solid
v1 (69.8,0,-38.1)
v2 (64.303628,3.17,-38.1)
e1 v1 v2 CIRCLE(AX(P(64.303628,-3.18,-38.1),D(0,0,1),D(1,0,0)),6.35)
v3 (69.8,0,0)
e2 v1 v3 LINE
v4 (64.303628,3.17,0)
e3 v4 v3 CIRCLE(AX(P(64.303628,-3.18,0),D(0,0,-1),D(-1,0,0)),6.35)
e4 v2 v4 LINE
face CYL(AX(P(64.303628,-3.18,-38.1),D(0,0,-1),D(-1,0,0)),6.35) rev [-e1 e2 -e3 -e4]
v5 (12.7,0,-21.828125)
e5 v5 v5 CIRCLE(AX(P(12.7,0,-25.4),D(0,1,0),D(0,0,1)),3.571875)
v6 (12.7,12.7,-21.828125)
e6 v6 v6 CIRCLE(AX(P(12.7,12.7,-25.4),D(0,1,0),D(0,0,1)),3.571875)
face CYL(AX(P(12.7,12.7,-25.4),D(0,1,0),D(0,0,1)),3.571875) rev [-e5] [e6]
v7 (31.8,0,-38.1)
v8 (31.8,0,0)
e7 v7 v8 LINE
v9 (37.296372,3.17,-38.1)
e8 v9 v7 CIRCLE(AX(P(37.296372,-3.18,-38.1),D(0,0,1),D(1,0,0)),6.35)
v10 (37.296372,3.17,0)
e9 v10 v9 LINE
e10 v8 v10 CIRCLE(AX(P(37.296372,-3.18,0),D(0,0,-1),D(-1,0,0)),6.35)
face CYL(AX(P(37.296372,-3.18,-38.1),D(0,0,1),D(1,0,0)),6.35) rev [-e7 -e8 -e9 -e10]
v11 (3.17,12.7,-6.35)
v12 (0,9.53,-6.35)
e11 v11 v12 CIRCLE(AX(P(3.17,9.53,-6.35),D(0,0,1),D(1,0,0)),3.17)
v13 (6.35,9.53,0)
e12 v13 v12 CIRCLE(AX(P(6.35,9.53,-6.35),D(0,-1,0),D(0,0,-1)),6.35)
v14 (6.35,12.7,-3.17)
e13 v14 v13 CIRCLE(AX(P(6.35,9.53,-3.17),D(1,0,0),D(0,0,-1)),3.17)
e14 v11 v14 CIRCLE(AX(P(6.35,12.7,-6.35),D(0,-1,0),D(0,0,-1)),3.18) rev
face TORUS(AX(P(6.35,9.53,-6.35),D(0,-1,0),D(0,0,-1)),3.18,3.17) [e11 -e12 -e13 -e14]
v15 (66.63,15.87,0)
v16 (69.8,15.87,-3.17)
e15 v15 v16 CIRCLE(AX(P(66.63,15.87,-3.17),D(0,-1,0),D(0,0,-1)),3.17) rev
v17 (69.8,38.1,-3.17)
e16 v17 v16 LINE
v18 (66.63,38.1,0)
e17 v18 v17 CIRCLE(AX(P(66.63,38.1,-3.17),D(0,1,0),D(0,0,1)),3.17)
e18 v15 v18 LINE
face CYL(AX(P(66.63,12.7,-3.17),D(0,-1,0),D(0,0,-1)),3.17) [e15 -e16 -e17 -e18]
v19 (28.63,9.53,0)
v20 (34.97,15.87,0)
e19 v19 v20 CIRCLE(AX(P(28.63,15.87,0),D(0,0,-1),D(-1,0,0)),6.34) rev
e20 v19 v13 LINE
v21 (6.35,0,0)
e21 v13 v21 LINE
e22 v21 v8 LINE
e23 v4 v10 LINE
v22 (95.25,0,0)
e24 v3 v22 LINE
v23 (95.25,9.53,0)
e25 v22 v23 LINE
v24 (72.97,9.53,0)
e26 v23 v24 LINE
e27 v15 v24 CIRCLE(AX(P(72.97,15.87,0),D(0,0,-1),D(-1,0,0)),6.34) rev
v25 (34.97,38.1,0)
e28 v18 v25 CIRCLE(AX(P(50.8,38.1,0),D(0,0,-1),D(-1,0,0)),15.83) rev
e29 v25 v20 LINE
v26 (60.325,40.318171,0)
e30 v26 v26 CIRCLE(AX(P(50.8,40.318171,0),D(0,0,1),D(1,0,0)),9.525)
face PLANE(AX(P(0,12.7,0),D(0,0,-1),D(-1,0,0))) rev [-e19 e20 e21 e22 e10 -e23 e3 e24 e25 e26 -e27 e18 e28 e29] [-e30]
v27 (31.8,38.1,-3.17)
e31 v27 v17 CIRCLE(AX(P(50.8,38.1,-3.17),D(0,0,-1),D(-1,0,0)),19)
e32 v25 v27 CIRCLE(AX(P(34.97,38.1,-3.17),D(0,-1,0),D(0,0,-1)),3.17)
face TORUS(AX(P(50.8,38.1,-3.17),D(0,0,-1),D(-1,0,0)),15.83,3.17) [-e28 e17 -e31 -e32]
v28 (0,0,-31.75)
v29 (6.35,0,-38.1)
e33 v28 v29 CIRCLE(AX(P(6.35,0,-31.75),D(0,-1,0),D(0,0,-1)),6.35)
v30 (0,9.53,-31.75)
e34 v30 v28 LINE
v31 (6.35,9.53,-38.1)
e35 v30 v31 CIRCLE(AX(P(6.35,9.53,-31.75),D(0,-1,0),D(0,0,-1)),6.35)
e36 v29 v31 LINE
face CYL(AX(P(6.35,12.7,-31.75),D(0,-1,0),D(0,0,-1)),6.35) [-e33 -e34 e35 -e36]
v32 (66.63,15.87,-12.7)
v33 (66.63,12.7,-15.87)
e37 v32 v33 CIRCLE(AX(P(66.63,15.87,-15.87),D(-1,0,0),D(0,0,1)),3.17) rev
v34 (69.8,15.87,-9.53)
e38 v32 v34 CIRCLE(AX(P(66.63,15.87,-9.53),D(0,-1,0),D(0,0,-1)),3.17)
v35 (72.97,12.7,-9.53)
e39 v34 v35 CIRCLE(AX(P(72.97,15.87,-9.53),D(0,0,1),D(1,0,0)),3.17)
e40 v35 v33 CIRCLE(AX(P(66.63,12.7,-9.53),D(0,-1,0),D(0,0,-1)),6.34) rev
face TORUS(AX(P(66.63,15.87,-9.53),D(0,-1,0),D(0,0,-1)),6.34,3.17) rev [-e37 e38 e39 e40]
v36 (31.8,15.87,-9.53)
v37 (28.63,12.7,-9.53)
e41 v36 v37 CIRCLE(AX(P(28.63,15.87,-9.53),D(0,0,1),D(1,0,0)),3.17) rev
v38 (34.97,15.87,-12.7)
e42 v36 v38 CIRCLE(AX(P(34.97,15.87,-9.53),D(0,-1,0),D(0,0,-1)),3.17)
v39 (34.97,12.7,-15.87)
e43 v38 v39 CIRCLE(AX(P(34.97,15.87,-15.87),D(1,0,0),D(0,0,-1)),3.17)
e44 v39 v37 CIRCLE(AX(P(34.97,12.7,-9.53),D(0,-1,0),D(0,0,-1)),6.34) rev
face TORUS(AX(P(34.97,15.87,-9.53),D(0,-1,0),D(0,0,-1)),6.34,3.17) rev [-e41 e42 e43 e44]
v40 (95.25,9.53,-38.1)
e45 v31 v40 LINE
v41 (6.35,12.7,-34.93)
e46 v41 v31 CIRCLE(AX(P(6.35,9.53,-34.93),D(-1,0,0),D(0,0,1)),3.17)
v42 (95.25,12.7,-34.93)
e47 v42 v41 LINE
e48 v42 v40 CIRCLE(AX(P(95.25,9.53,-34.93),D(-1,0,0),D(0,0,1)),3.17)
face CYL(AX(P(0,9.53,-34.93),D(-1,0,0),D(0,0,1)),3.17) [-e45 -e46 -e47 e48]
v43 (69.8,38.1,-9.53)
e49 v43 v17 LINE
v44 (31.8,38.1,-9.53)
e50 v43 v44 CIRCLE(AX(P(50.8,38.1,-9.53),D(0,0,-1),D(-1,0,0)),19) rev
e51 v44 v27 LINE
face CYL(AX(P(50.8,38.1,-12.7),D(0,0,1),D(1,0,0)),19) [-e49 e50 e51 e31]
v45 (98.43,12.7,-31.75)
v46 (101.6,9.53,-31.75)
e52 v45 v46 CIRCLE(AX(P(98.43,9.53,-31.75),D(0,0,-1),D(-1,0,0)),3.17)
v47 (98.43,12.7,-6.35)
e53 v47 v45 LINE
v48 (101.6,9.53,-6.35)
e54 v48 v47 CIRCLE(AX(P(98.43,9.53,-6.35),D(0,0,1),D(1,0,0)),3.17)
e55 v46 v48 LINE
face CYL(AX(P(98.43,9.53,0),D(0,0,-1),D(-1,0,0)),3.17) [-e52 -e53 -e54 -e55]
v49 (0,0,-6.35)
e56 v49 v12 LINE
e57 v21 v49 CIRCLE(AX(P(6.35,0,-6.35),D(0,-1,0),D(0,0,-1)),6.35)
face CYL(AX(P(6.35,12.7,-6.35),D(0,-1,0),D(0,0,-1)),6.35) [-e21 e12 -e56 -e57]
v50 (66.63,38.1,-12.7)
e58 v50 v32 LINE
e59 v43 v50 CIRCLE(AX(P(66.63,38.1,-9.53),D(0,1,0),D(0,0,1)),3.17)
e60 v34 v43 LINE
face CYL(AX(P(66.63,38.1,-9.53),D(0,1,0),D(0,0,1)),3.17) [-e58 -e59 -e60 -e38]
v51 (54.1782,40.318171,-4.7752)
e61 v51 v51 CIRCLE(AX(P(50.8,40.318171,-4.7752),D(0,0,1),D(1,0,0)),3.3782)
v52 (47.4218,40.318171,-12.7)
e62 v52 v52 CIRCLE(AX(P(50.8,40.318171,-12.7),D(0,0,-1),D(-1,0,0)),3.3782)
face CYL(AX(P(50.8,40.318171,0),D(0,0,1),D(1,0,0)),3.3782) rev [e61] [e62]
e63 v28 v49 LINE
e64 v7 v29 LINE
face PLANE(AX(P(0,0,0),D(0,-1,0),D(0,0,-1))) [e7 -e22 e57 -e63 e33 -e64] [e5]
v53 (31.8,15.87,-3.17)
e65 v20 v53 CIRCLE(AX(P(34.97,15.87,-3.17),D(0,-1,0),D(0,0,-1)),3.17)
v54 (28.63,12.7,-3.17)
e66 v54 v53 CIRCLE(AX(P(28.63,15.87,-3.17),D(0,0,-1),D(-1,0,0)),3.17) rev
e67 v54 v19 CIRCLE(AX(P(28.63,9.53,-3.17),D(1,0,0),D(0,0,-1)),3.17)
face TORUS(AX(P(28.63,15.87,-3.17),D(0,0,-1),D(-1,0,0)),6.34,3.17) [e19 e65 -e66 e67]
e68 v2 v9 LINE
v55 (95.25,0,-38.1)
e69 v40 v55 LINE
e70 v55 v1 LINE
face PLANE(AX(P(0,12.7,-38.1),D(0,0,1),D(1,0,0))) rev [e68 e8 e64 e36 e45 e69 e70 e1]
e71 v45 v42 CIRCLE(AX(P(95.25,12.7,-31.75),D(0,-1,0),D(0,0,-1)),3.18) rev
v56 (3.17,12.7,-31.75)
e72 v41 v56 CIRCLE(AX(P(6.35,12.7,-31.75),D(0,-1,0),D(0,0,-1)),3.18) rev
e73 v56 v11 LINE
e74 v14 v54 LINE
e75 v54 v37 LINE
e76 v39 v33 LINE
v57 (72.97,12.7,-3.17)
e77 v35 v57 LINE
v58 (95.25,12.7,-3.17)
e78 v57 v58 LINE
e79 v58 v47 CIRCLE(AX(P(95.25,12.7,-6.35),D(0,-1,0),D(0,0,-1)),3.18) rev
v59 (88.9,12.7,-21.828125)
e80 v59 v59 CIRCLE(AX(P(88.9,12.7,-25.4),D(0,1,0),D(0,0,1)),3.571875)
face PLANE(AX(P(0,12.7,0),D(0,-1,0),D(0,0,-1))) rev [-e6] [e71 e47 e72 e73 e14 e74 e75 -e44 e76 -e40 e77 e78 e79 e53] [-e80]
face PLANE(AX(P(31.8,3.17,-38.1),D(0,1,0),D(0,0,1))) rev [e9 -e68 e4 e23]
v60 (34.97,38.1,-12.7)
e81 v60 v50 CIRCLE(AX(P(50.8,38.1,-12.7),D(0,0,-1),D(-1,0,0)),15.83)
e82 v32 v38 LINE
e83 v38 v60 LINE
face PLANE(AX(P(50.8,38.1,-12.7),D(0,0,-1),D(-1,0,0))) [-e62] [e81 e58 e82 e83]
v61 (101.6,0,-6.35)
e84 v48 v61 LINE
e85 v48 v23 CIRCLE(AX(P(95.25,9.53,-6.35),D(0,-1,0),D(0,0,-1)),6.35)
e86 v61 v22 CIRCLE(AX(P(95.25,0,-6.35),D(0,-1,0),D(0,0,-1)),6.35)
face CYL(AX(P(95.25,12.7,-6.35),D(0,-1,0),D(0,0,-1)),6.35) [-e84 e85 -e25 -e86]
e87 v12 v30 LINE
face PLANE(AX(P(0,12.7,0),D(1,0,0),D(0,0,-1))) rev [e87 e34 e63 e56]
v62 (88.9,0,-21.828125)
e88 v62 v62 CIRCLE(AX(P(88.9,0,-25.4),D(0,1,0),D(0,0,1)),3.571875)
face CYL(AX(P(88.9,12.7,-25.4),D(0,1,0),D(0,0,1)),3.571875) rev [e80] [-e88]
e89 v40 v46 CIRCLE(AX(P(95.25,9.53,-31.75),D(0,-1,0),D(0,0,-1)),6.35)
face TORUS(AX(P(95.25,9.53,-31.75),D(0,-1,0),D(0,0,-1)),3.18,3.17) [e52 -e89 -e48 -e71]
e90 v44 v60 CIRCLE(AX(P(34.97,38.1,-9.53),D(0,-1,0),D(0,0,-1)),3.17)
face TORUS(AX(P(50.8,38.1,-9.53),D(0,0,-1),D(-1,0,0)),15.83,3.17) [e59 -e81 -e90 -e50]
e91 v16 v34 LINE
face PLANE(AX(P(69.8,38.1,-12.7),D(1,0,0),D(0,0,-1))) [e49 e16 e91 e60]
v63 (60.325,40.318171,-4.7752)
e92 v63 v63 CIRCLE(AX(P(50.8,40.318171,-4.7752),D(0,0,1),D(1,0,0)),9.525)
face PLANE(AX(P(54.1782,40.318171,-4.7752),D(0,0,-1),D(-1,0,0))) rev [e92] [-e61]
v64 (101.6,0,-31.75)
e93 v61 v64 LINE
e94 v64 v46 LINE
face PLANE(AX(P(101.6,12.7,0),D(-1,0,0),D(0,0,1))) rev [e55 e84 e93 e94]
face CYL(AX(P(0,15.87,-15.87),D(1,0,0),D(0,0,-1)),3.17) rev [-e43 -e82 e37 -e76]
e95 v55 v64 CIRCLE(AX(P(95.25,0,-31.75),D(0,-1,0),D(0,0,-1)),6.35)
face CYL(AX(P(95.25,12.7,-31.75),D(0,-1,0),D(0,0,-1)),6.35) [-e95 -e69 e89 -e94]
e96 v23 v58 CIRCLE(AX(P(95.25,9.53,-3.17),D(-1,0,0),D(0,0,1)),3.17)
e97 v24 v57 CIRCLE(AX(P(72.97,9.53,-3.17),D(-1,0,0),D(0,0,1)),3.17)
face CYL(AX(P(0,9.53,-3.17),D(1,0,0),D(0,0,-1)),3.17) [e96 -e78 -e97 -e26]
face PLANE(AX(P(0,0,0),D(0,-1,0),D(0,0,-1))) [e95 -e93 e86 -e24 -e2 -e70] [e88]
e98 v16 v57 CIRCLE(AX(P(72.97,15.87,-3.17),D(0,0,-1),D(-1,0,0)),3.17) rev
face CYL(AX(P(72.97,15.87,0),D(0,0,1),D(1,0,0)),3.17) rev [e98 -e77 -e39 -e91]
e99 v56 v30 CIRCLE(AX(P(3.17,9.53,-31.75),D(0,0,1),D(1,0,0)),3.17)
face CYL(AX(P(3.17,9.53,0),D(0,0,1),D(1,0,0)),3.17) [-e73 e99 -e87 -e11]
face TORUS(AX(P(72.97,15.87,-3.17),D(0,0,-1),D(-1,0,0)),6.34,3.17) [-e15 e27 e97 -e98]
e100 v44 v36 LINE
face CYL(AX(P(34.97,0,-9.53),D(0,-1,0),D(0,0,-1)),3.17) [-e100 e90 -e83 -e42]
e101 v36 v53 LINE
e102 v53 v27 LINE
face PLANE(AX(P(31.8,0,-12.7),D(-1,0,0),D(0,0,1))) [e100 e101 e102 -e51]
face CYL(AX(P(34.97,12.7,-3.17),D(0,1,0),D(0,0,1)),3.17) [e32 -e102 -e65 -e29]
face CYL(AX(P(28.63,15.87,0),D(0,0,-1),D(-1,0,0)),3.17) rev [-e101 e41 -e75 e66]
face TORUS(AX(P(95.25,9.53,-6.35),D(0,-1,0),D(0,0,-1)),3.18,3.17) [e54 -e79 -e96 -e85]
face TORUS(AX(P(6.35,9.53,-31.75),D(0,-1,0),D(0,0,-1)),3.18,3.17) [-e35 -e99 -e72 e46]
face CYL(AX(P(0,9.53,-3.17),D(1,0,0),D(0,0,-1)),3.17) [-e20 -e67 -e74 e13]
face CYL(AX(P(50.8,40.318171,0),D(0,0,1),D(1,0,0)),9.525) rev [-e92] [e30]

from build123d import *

# Parameters (mm, degrees)
SKETCH1_W                                = 101.6
SKETCH1_H                                = 38.1
BASEPLATE_DEPTH                          = 12.7
VERTBOSS_DEPTH                           = 12.7
F_9_32_0_28125_DIAMETER_HOLE1_D          = 7.14375
CBORE_FOR_1_4_HEX_HEAD_BOLT1_D           = 6.7564
CBORE_FOR_1_4_HEX_HEAD_BOLT1_CBORE_D     = 19.05
CBORE_FOR_1_4_HEX_HEAD_BOLT1_CBORE_DEPTH = 4.7752
SKETCH11_W                               = 38
SKETCH11_H                               = 3.17
BOTTOMSLOT_DEPTH                         = 123.615578129
FILLET1_R                                = 6.35
FILLET2_R                                = 3.17


with BuildPart() as part:
    # Sketch1 → BasePlate (new body)
    with BuildSketch(Plane(origin=(0, 0, 0), x_dir=(1, 0, 0), z_dir=(0, 1, 0))):
        with Locations((50.8, 19.05)):
            Rectangle(SKETCH1_W, SKETCH1_H)
    extrude(amount=BASEPLATE_DEPTH)

    # Sketch3 → VertBoss (add)
    with BuildSketch(Plane.XY):
        with BuildLine():
            Line((31.8, 0), (31.8, 38.1))
            ThreePointArc((31.8, 38.1), (50.8, 57.1), (69.8, 38.1))
            Line((69.8, 38.1), (69.8, 0))
            Line((69.8, 0), (31.8, 0))
        make_face()
    extrude(amount=-VERTBOSS_DEPTH)

    # 9/32 (0.28125) Diameter Hole1 (through all)
    with Locations(Plane(origin=(0, 12.7, 0), x_dir=(1, 0, 0), z_dir=(0, 1, 0))):
        with Locations((88.9, 25.4), (12.7, 25.4)):
            Hole(F_9_32_0_28125_DIAMETER_HOLE1_D / 2)

    # CBORE for 1/4 Hex Head Bolt1 (through all)
    with Locations(Plane.XY):
        with Locations((50.8, 40.318171365)):
            CounterBoreHole(CBORE_FOR_1_4_HEX_HEAD_BOLT1_D / 2, CBORE_FOR_1_4_HEX_HEAD_BOLT1_CBORE_D / 2, CBORE_FOR_1_4_HEX_HEAD_BOLT1_CBORE_DEPTH)

    # Sketch11 → BottomSlot (cut, through all)
    with BuildSketch(Plane.XY):
        with Locations((50.8, 1.585)):
            Rectangle(SKETCH11_W, SKETCH11_H)
    extrude(amount=-BOTTOMSLOT_DEPTH, mode=Mode.SUBTRACT)

    # Fillet1
    # the kernel refuses this fillet: 6.35 mm, written as the material it adds along each edge
    with BuildSketch(Plane(origin=(69.8, 3.17, 0), x_dir=(-1, 0, 0), z_dir=(0, 0, -1))) as fillet1_piece_1:
        with BuildLine():
            CenterArc((5.49637153, -6.35), FILLET1_R, 90, 59.947892244)
            Line((0, -3.17), (0, 0))
            Line((0, 0), (5.49637153, 0))
        make_face()
    extrude(amount=38.1)
    with BuildSketch(Plane(origin=(31.8, 3.17, 0), x_dir=(0, -1, 0), z_dir=(0, 0, -1))) as fillet1_piece_2:
        with BuildLine():
            CenterArc((6.35, -5.49637153), FILLET1_R, 120.052107756, 59.947892244)
            Line((0, -5.49637153), (0, 0))
            Line((0, 0), (3.17, 0))
        make_face()
    extrude(amount=38.1)
    # the kernel refuses this fillet: 6.35 mm, written as the material it takes off along each edge
    with BuildSketch(Plane(origin=(0, -15.875, -38.1), x_dir=(0, 0, 1), z_dir=(0, 1, 0)), Plane(origin=(0, -15.875, 0), x_dir=(1, 0, 0), z_dir=(0, 1, 0))) as fillet1_2_piece_1:
        with BuildLine():
            CenterArc((FILLET1_R, FILLET1_R), FILLET1_R, 180, 90)
            Line((0, FILLET1_R), (0, 0))
            Line((0, 0), (FILLET1_R, 0))
        make_face()
    extrude(amount=44.45, mode=Mode.SUBTRACT)
    with BuildSketch(Plane(origin=(101.6, -15.875, -38.1), x_dir=(0, 0, 1), z_dir=(0, 1, 0)), Plane(origin=(101.6, -15.875, 0), x_dir=(-1, 0, 0), z_dir=(0, 1, 0))) as fillet1_2_piece_2:
        with BuildLine():
            CenterArc((FILLET1_R, -FILLET1_R), FILLET1_R, 90, 90)
            Line((0, -FILLET1_R), (0, 0))
            Line((0, 0), (FILLET1_R, 0))
        make_face()
    extrude(amount=44.45, mode=Mode.SUBTRACT)

    # Fillet2
    fillet2_edges = [part.edges().sort_by_distance(p)[0] for p in [
        (82.525, 12.7, 0),
        (31.8, 25.4, -12.7),
        (69.8, 25.4, -12.7),
        (31.8, 25.4, 0),
        (69.8, 25.4, 0),
        (50.8, 57.1, 0),
        (31.8, 12.7, -6.35),
        (50.8, 57.1, -12.7),
        (69.8, 12.7, -6.35),
        (50.8, 12.7, -12.7),
        (0, 12.7, -19.05),
        (50.8, 12.7, -38.1),
        (19.075, 12.7, 0),
        (101.6, 12.7, -19.05),
        (99.740128061, 12.7, -1.859871939),
        (99.740128061, 12.7, -36.240128061),
        (1.859871939, 12.7, -1.859871939),
        (1.859871939, 12.7, -36.240128061),
    ]]
    fillet(fillet2_edges, radius=FILLET2_R)


solid = part.part
